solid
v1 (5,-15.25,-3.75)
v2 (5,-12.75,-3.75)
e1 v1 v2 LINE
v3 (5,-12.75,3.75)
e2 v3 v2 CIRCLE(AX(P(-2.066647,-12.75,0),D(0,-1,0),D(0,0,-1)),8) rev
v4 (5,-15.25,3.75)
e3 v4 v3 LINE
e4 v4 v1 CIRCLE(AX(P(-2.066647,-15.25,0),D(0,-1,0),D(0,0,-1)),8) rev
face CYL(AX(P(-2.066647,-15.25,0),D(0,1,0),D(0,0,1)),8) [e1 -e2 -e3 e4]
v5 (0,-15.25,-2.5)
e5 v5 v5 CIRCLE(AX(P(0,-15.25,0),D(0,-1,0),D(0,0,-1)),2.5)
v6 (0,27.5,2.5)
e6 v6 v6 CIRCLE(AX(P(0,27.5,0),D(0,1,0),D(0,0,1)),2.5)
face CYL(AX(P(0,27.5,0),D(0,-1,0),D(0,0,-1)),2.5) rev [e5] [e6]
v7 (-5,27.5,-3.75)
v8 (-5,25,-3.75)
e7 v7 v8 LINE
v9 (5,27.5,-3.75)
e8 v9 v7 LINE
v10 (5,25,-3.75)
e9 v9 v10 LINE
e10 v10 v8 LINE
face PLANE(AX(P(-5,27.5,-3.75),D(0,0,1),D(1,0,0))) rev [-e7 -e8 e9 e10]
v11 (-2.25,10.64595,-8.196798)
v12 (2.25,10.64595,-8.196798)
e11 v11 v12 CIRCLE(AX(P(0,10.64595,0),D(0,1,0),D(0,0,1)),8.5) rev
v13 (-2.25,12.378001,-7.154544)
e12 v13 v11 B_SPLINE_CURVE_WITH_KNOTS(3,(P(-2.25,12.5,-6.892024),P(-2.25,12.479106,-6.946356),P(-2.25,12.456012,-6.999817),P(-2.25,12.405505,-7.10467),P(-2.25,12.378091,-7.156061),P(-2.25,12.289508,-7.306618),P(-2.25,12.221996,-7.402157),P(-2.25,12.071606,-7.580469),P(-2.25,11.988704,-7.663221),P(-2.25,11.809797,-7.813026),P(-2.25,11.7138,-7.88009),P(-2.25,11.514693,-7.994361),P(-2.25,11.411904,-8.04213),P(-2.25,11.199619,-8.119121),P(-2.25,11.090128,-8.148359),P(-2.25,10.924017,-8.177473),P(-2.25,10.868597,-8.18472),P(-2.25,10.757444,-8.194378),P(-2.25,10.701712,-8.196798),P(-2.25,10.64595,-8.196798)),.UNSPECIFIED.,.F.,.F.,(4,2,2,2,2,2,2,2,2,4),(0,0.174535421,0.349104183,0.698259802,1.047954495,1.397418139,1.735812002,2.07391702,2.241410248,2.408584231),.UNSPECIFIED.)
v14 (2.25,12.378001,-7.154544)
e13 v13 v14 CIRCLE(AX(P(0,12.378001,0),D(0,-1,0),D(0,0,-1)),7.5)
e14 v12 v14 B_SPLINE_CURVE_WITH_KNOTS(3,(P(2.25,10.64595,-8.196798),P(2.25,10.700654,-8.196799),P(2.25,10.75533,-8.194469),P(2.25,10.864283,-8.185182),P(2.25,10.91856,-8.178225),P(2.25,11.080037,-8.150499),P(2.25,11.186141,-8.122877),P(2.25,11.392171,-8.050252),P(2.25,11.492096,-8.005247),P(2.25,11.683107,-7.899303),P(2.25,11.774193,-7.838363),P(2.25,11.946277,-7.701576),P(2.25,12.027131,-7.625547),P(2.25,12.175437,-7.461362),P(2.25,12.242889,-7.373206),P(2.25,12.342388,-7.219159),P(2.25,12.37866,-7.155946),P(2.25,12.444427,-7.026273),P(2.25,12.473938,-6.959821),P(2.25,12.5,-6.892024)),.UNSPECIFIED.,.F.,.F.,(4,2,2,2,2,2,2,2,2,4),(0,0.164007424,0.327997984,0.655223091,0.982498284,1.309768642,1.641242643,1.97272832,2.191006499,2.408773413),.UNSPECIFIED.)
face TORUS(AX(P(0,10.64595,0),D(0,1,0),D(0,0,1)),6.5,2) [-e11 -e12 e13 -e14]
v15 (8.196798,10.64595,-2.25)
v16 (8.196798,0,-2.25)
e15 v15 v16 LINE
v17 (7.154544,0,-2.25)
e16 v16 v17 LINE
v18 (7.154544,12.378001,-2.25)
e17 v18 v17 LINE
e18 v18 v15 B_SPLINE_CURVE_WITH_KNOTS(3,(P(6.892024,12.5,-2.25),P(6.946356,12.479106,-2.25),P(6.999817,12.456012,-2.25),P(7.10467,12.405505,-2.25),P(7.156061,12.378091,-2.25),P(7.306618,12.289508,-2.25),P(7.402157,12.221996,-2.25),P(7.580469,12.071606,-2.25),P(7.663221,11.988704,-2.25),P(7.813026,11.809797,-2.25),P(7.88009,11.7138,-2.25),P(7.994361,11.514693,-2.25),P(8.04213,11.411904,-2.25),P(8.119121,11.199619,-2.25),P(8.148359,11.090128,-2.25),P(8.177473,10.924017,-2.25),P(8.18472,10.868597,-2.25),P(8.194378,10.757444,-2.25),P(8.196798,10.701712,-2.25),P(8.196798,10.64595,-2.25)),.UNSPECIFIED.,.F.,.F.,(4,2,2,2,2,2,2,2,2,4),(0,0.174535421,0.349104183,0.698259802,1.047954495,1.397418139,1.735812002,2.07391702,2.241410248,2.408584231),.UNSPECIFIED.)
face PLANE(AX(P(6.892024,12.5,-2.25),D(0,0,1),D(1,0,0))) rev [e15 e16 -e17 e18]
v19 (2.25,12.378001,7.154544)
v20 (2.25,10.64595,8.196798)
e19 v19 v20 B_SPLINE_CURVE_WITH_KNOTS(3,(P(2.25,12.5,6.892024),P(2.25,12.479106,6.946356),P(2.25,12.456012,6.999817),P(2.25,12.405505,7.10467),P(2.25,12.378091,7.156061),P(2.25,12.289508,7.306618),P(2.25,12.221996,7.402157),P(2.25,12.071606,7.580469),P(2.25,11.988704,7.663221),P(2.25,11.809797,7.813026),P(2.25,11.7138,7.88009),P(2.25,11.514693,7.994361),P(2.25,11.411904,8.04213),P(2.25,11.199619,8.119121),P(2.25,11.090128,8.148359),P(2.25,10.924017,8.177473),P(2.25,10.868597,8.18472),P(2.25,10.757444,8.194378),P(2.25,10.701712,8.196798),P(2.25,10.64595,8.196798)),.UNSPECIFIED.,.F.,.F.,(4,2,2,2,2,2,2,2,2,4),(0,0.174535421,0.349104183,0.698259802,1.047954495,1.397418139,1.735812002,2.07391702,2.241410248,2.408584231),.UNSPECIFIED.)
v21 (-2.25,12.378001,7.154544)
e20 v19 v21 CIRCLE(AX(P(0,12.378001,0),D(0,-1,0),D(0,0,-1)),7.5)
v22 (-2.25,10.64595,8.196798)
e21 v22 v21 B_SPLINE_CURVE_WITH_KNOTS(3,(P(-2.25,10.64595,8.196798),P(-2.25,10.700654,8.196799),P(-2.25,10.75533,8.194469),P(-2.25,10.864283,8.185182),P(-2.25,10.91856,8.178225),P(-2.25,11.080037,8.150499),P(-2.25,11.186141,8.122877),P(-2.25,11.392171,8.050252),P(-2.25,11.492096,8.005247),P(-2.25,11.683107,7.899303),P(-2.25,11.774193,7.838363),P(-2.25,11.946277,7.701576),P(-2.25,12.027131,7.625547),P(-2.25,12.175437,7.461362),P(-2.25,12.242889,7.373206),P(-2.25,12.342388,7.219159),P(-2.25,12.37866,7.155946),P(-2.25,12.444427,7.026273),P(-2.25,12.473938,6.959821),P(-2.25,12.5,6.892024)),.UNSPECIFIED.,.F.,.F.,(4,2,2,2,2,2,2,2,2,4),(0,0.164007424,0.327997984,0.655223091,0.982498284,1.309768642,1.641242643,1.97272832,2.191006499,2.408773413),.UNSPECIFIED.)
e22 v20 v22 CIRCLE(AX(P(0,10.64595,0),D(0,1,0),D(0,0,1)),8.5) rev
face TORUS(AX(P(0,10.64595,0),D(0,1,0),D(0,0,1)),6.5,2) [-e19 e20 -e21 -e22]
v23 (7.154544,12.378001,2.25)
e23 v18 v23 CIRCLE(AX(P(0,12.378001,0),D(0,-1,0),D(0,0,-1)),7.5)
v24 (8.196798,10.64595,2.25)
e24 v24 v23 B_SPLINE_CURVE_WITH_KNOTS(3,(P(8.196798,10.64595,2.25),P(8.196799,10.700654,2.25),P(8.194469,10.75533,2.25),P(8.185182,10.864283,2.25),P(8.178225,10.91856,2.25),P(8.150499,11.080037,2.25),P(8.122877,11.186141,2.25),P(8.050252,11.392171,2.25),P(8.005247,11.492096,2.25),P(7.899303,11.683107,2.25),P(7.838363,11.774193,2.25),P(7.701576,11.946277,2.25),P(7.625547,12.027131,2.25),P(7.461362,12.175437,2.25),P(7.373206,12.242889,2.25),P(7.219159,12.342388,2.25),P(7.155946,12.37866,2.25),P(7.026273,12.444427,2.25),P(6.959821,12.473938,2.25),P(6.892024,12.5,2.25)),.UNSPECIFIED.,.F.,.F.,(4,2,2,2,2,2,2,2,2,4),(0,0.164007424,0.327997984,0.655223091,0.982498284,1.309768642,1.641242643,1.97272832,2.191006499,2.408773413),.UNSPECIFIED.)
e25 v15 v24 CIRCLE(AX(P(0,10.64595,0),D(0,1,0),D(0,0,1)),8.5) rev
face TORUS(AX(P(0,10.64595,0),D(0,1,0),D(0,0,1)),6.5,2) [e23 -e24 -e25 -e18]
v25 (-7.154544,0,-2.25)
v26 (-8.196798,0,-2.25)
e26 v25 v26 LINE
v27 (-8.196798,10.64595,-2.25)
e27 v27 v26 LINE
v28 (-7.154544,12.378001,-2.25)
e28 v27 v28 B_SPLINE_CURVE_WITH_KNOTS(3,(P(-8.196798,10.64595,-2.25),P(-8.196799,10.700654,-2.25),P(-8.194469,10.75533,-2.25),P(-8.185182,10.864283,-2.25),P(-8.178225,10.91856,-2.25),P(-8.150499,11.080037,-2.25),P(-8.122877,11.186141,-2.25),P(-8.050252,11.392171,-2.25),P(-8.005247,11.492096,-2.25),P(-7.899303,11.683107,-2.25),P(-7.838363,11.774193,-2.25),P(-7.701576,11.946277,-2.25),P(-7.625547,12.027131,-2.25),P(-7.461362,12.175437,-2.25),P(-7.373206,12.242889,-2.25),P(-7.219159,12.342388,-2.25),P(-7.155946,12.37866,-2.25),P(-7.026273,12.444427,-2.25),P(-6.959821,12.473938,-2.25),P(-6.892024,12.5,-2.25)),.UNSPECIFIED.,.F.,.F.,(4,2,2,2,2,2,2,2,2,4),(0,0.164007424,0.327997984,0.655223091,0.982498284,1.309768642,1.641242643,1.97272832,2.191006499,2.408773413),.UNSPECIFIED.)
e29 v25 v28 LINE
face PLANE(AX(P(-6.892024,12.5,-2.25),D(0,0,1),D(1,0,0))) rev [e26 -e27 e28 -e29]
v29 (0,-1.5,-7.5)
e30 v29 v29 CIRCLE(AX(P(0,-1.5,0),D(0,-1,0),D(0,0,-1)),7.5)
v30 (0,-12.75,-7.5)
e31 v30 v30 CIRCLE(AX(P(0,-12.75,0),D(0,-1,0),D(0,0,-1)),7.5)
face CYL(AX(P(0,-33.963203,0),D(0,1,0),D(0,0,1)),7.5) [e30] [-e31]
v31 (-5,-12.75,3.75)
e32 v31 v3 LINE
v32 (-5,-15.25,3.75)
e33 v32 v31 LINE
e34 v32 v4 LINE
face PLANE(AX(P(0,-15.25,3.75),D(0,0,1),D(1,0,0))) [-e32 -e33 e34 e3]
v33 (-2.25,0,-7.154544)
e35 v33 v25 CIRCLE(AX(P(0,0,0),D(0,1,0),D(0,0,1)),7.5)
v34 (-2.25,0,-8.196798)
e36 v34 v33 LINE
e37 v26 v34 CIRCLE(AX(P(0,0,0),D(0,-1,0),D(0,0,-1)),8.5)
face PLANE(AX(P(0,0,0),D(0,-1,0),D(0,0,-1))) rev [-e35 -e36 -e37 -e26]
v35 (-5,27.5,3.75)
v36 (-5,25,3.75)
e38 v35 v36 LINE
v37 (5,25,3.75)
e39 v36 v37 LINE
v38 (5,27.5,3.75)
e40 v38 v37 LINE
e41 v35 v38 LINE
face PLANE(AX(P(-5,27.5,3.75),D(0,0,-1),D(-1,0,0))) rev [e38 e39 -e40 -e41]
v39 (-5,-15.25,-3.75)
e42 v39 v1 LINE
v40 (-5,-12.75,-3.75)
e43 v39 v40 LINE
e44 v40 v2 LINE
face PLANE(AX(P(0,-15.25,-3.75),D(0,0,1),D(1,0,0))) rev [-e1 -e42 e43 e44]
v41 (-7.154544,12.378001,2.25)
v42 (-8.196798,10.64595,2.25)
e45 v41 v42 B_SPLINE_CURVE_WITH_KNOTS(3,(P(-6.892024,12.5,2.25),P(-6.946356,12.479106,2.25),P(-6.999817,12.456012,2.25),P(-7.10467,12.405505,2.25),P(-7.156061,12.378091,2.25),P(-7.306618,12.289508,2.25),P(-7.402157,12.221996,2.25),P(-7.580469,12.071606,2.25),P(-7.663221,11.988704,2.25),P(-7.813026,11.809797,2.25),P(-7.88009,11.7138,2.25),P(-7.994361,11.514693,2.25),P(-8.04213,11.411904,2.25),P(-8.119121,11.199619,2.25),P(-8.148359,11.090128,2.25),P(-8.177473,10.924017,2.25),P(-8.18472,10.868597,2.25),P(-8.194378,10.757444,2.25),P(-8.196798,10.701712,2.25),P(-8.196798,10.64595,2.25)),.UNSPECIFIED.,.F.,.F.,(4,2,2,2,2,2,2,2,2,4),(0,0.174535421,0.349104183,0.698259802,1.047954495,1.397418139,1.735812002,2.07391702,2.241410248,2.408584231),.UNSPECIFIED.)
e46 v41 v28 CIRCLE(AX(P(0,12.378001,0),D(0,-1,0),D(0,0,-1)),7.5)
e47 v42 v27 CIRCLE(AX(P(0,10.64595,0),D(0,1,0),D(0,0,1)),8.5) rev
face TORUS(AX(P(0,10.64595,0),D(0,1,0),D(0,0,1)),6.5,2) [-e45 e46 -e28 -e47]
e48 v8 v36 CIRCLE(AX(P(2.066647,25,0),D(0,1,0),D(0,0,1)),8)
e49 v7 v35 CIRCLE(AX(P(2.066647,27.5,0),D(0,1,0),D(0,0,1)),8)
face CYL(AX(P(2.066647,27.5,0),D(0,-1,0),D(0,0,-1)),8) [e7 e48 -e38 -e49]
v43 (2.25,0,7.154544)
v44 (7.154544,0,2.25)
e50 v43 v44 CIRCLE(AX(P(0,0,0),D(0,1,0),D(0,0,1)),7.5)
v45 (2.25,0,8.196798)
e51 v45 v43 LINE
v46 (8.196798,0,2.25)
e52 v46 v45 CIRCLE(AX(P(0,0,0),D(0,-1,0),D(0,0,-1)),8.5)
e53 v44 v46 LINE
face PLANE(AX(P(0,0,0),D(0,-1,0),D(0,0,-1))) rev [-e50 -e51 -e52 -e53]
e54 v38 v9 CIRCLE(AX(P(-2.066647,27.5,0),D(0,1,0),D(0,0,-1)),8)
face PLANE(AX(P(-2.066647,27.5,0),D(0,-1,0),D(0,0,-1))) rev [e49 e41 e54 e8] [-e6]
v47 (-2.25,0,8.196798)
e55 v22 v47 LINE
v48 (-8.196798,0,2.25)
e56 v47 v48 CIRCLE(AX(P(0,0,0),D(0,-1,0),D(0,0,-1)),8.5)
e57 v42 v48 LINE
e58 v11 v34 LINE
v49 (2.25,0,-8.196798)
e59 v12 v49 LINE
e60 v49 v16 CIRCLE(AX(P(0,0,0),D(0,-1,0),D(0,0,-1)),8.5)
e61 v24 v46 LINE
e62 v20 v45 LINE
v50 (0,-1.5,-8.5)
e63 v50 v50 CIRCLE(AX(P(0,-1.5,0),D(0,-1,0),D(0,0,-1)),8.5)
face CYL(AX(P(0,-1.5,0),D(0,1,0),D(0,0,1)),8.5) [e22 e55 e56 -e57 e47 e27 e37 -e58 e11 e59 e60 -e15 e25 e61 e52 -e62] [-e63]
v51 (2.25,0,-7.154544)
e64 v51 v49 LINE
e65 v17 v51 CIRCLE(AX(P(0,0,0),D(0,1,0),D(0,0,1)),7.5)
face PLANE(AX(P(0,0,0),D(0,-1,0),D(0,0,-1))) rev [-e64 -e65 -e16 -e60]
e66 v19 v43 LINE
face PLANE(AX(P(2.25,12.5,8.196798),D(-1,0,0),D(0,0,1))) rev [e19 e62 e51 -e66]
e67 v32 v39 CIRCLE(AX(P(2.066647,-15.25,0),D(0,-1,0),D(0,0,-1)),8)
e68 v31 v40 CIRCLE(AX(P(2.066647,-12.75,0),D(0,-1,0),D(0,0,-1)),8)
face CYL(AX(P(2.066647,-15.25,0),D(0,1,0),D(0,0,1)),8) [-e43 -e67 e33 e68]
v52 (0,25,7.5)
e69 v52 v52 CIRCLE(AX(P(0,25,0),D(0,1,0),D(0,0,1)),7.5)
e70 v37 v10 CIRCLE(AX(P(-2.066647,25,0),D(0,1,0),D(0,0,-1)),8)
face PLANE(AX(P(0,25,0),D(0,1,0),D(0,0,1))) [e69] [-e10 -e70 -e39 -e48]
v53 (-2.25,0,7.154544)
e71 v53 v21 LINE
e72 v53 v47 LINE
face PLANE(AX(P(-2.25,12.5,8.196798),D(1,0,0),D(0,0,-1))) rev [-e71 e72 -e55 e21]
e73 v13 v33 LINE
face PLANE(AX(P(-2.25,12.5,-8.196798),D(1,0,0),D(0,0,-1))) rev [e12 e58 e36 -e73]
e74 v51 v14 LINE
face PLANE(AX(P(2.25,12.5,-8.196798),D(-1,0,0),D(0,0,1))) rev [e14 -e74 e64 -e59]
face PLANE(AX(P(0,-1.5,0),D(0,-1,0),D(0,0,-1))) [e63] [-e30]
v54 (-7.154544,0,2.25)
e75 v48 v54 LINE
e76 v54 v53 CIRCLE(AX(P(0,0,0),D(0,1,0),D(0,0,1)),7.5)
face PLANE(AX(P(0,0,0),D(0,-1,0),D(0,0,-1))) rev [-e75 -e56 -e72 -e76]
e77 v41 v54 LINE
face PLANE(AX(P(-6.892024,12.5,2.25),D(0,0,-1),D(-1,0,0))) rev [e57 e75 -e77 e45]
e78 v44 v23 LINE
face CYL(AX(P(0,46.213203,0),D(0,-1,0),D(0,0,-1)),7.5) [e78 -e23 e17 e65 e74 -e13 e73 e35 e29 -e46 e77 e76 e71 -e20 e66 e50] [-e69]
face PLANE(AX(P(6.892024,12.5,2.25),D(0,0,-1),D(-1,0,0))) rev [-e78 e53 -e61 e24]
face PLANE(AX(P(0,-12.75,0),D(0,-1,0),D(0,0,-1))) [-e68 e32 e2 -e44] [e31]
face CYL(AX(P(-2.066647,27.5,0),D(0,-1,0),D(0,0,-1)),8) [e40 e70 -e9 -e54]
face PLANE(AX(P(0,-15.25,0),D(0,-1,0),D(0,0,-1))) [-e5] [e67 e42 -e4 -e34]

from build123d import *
from build123d.topology import SkipClean

# Parameters (mm, degrees)
SKETCH1_R            = 7.25
BOSS_EXTRUDE1_DEPTH  = 25
SKETCH2_R            = 2.1
BOSS_EXTRUDE2_DEPTH  = 2.5
SKETCH4_R            = 8.5
BOSS_EXTRUDE3_DEPTH  = 1.5
BOSS_EXTRUDE5_DEPTH  = 12.5
FILLET2_R            = 2
BOSS_EXTRUDE6_START  = 11.25
SKETCH6_R            = 7.25
BOSS_EXTRUDE6_DEPTH  = 11.25
BOSS_EXTRUDE7_START  = 2.5
SKETCH7_R            = 2.1
BOSS_EXTRUDE7_DEPTH  = 2.5
SKETCH8_R            = 2.1
CUT_EXTRUDE1_DEPTH   = 53.5
BOSS_EXTRUDE8_START  = 11.25
SKETCH9_R            = 7.5
SKETCH9_R_2          = 7.25
BOSS_EXTRUDE8_DEPTH  = 11.25
SKETCH10_R           = 7.5
SKETCH10_R_2         = 7.25
BOSS_EXTRUDE9_DEPTH  = 25
SKETCH11_R           = 2.15
CUT_EXTRUDE2_DEPTH   = 50
SKETCH12_R           = 6.607325953
CUT_EXTRUDE3_DEPTH   = 2.5
SKETCH13_R           = 6.756490311
CUT_EXTRUDE4_DEPTH   = 2.5
SKETCH14_W           = 10
SKETCH14_H           = 7.5
SKETCH14_R           = 2.15
BOSS_EXTRUDE10_DEPTH = 2.5
BOSS_EXTRUDE11_START = 2.5
SKETCH15_R           = 2.5
BOSS_EXTRUDE11_DEPTH = 2.5
SKETCH16_R           = 2.5
CUT_EXTRUDE5_DEPTH   = 61.5


with BuildPart() as part:
    # Sketch1 → Boss-Extrude1 (new body)
    with BuildSketch(Plane(origin=(0, 0, 0), x_dir=(1, 0, 0), z_dir=(0, 1, 0))):
        with Locations(Location((0, 0, 0), (0, 0, 270))):
            Circle(SKETCH1_R)
    extrude(amount=BOSS_EXTRUDE1_DEPTH)

    # Sketch2 → Boss-Extrude2 (add)
    with BuildSketch(Plane(origin=(0, 25, 0), x_dir=(1, 0, 0), z_dir=(0, 1, 0))):
        with BuildLine():
            Line((-4.9, -3.65), (4.9, -3.65))
            ThreePointArc((4.9, -3.65), (5.781186897, 0), (4.9, 3.65))
            Line((4.9, 3.65), (-4.9, 3.65))
            ThreePointArc((-4.9, 3.65), (-5.781186897, 0), (-4.9, -3.65))
        make_face()
        with Locations(Location((0, 0, 0), (0, 0, 270))):
            Circle(SKETCH2_R, mode=Mode.SUBTRACT)
    extrude(amount=BOSS_EXTRUDE2_DEPTH)

    # Sketch4 → Boss-Extrude3 (add)
    with BuildSketch(Plane(origin=(0, 0, 0), x_dir=(-1, 0, 0), z_dir=(0, -1, 0))):
        with Locations(Location((0, 0, 0), (0, 0, 90))):
            Circle(SKETCH4_R)
    extrude(amount=BOSS_EXTRUDE3_DEPTH)

    # Sketch5 → Boss-Extrude5 (add)
    with SkipClean():  # the faces are left unmerged after this step: merging them gives an invalid solid
        with BuildSketch(Plane(origin=(0, 0, 0), x_dir=(1, 0, 0), z_dir=(0, 1, 0))):
            with BuildLine():
                Line((-2.25, 8.196798155), (-2.25, 6.892024376))
                ThreePointArc((-2.25, 6.892024376), (0, 7.25), (2.25, 6.892024376))
                Line((2.25, 6.892024376), (2.25, 8.196798155))
                ThreePointArc((2.25, 8.196798155), (0, 8.5), (-2.25, 8.196798155))
            make_face()
            with BuildLine():
                Line((6.892024376, 2.25), (8.196798155, 2.25))
                ThreePointArc((8.196798155, 2.25), (8.5, 0), (8.196798155, -2.25))
                Line((8.196798155, -2.25), (6.892024376, -2.25))
                ThreePointArc((6.892024376, -2.25), (7.25, 0), (6.892024376, 2.25))
            make_face()
            with BuildLine():
                Line((2.25, -8.196798155), (2.25, -6.892024376))
                ThreePointArc((2.25, -6.892024376), (0, -7.25), (-2.25, -6.892024376))
                Line((-2.25, -6.892024376), (-2.25, -8.196798155))
                ThreePointArc((-2.25, -8.196798155), (0, -8.5), (2.25, -8.196798155))
            make_face()
            with BuildLine():
                Line((-6.892024376, -2.25), (-8.196798155, -2.25))
                ThreePointArc((-8.196798155, -2.25), (-8.5, 0), (-8.196798155, 2.25))
                Line((-8.196798155, 2.25), (-6.892024376, 2.25))
                ThreePointArc((-6.892024376, 2.25), (-7.25, 0), (-6.892024376, -2.25))
            make_face()
        extrude(amount=BOSS_EXTRUDE5_DEPTH)

    # Fillet2
    # the kernel refuses this fillet: 2 mm, written as the material it takes off along each edge
    with BuildSketch(Plane(origin=(0, 12.5, 0), x_dir=(-0.6871531367836845, 0, 0.72651260595281), z_dir=(0.72651260595281, 0, 0.6871531367836845))) as fillet2_piece_1:
        with BuildLine():
            CenterArc((6.5, 1.854049622), FILLET2_R, 292.024312837, 67.975687163)
            Line((7.25, 0), (7.265, -0.037080992))
            ThreePointArc((7.265, -0.037080992), (7.875, -0.04), (8.5, -0.04))
            Line((8.5, -0.04), (8.54, 0))
            Line((8.54, 0), (8.54, 1.854049622))
            Line((8.54, 1.854049622), (8.5, 1.854049622))
        make_face()
    revolve(axis=Axis((0, 12.5, 0), (0, -1, 0)), revolution_arc=93.189649372, mode=Mode.SUBTRACT)
    with BuildSketch(Plane(origin=(0, 12.5, 0), x_dir=(0.7265126059528094, 0, -0.687153136783685), z_dir=(0.687153136783685, 0, 0.7265126059528094))) as fillet2_piece_2:
        with BuildLine():
            CenterArc((6.5, -1.854049622), FILLET2_R, 0, 67.975687163)
            Line((7.25, 0), (7.265, 0.037080992))
            ThreePointArc((7.265, 0.037080992), (7.875, 0.04), (8.5, 0.04))
            Line((8.5, 0.04), (8.54, 0))
            Line((8.54, 0), (8.54, -1.854049622))
            Line((8.54, -1.854049622), (8.5, -1.854049622))
        make_face()
    revolve(axis=Axis((0, 12.5, 0), (0, 1, 0)), revolution_arc=93.189649372, mode=Mode.SUBTRACT)
    with BuildSketch(Plane(origin=(0, 12.5, 0), x_dir=(0.687153136783685, 0, -0.7265126059528094), z_dir=(-0.7265126059528094, 0, -0.687153136783685))) as fillet2_piece_3:
        with BuildLine():
            CenterArc((6.5, 1.854049622), FILLET2_R, 292.024312837, 67.975687163)
            Line((7.25, 0), (7.265, -0.037080992))
            ThreePointArc((7.265, -0.037080992), (7.875, -0.04), (8.5, -0.04))
            Line((8.5, -0.04), (8.54, 0))
            Line((8.54, 0), (8.54, 1.854049622))
            Line((8.54, 1.854049622), (8.5, 1.854049622))
        make_face()
    revolve(axis=Axis((0, 12.5, 0), (0, -1, 0)), revolution_arc=93.189649372, mode=Mode.SUBTRACT)
    with BuildSketch(Plane(origin=(0, 12.5, 0), x_dir=(-0.7265126059528072, 0, 0.6871531367836876), z_dir=(-0.6871531367836876, 0, -0.7265126059528072))) as fillet2_piece_4:
        with BuildLine():
            CenterArc((6.5, -1.854049622), FILLET2_R, 0, 67.975687163)
            Line((7.25, 0), (7.265, 0.037080992))
            ThreePointArc((7.265, 0.037080992), (7.875, 0.04), (8.5, 0.04))
            Line((8.5, 0.04), (8.54, 0))
            Line((8.54, 0), (8.54, -1.854049622))
            Line((8.54, -1.854049622), (8.5, -1.854049622))
        make_face()
    revolve(axis=Axis((0, 12.5, 0), (0, 1, 0)), revolution_arc=93.189649372, mode=Mode.SUBTRACT)

    # Sketch6 → Boss-Extrude6 (add)
    with BuildSketch(Plane(origin=(0, -1.5, 0), x_dir=(-1, 0, 0), z_dir=(0, -1, 0)).offset(BOSS_EXTRUDE6_START)):
        with Locations(Location((0, 0, 0), (0, 0, 108.080012624))):
            Circle(SKETCH6_R)
    extrude(amount=-BOSS_EXTRUDE6_DEPTH)

    # Sketch7 → Boss-Extrude7 (add)
    with BuildSketch(Plane(origin=(0, -12.75, 0), x_dir=(-1, 0, 0), z_dir=(0, -1, 0)).offset(BOSS_EXTRUDE7_START)):
        with BuildLine():
            Line((4.9, 3.65), (-4.9, 3.65))
            ThreePointArc((-4.9, 3.65), (-5.781186897, 0), (-4.9, -3.65))
            Line((-4.9, -3.65), (4.9, -3.65))
            ThreePointArc((4.9, -3.65), (5.781186897, 0), (4.9, 3.65))
        make_face()
        with Locations(Location((0, 0, 0), (0, 0, 270))):
            Circle(SKETCH7_R, mode=Mode.SUBTRACT)
    extrude(amount=-BOSS_EXTRUDE7_DEPTH)

    # Sketch8 → Cut-Extrude1 (cut)
    with BuildSketch(Plane(origin=(0, -12.75, 0), x_dir=(-1, 0, 0), z_dir=(0, -1, 0))):
        with Locations(Location((0, 0, 0), (0, 0, 90))):
            Circle(SKETCH8_R)
    extrude(amount=-CUT_EXTRUDE1_DEPTH, mode=Mode.SUBTRACT)

    # Sketch9 → Boss-Extrude8 (add)
    with BuildSketch(Plane.XZ.offset(1.5).offset(BOSS_EXTRUDE8_START)):
        with Locations(Location((0, 0, 0), (0, 0, 270))):
            Circle(SKETCH9_R)
        with Locations(Location((0, 0, 0), (0, 0, 288.080012624))):
            Circle(SKETCH9_R_2, mode=Mode.SUBTRACT)
    extrude(amount=-BOSS_EXTRUDE8_DEPTH)

    # Sketch10 → Boss-Extrude9 (add)
    with BuildSketch(Plane(origin=(0, 0, 0), x_dir=(1, 0, 0), z_dir=(0, 1, 0))):
        with Locations(Location((0, 0, 0), (0, 0, 90))):
            Circle(SKETCH10_R)
        Circle(SKETCH10_R_2, mode=Mode.SUBTRACT)
    extrude(amount=BOSS_EXTRUDE9_DEPTH)

    # Sketch11 → Cut-Extrude2 (cut)
    with BuildSketch(Plane(origin=(0, 27.5, 0), x_dir=(1, 0, 0), z_dir=(0, 1, 0))):
        with Locations(Location((0, 0, 0), (0, 0, 270))):
            Circle(SKETCH11_R)
    extrude(amount=-CUT_EXTRUDE2_DEPTH, mode=Mode.SUBTRACT)

    # Sketch12 → Cut-Extrude3 (cut)
    with BuildSketch(Plane(origin=(0, -15.25, 0), x_dir=(-1, 0, 0), z_dir=(0, -1, 0))):
        Circle(SKETCH12_R)
    extrude(amount=-CUT_EXTRUDE3_DEPTH, mode=Mode.SUBTRACT)

    # Sketch13 → Cut-Extrude4 (cut)
    with BuildSketch(Plane(origin=(0, 27.5, 0), x_dir=(1, 0, 0), z_dir=(0, 1, 0))):
        Circle(SKETCH13_R)
    extrude(amount=-CUT_EXTRUDE4_DEPTH, mode=Mode.SUBTRACT)

    # Sketch14 → Boss-Extrude10 (add)
    # profile 1 of 3: a face of its own
    with BuildSketch(Plane(origin=(0, -12.75, 0), x_dir=(-1, 0, 0), z_dir=(0, -1, 0))):
        Rectangle(SKETCH14_W, SKETCH14_H)
        with Locations(Location((0, 0, 0), (0, 0, 270))):
            Circle(SKETCH14_R, mode=Mode.SUBTRACT)
    # profile 2 of 3: a face of its own
    with BuildSketch(Plane(origin=(0, -12.75, 0), x_dir=(-1, 0, 0), z_dir=(0, -1, 0))):
        with BuildLine():
            Line((5, 3.75), (5, -3.75))
            ThreePointArc((5, -3.75), (5.933352987, 0), (5, 3.75))
        make_face()
    # profile 3 of 3: a face of its own
    with BuildSketch(Plane(origin=(0, -12.75, 0), x_dir=(-1, 0, 0), z_dir=(0, -1, 0))):
        with BuildLine():
            ThreePointArc((-5, -3.75), (-5.933352987, 0), (-5, 3.75))
            Line((-5, 3.75), (-5, -3.75))
        make_face()
    extrude(amount=BOSS_EXTRUDE10_DEPTH)

    # Sketch15 → Boss-Extrude11 (add)
    with BuildSketch(Plane(origin=(0, 25, 0), x_dir=(1, 0, 0), z_dir=(0, 1, 0)).offset(BOSS_EXTRUDE11_START)):
        with BuildLine():
            Line((-5, -3.75), (5, -3.75))
            ThreePointArc((5, -3.75), (5.933352987, 0), (5, 3.75))
            Line((5, 3.75), (-5, 3.75))
            ThreePointArc((-5, 3.75), (-5.933352987, 0), (-5, -3.75))
        make_face()
        with Locations(Location((0, 0, 0), (0, 0, 270))):
            Circle(SKETCH15_R, mode=Mode.SUBTRACT)
    extrude(amount=-BOSS_EXTRUDE11_DEPTH)

    # Sketch16 → Cut-Extrude5 (cut)
    with BuildSketch(Plane(origin=(0, 25, 0), x_dir=(1, 0, 0), z_dir=(0, 1, 0))):
        with Locations(Location((0, 0, 0), (0, 0, 90))):
            Circle(SKETCH16_R)
    extrude(amount=-CUT_EXTRUDE5_DEPTH, mode=Mode.SUBTRACT)


solid = part.part
